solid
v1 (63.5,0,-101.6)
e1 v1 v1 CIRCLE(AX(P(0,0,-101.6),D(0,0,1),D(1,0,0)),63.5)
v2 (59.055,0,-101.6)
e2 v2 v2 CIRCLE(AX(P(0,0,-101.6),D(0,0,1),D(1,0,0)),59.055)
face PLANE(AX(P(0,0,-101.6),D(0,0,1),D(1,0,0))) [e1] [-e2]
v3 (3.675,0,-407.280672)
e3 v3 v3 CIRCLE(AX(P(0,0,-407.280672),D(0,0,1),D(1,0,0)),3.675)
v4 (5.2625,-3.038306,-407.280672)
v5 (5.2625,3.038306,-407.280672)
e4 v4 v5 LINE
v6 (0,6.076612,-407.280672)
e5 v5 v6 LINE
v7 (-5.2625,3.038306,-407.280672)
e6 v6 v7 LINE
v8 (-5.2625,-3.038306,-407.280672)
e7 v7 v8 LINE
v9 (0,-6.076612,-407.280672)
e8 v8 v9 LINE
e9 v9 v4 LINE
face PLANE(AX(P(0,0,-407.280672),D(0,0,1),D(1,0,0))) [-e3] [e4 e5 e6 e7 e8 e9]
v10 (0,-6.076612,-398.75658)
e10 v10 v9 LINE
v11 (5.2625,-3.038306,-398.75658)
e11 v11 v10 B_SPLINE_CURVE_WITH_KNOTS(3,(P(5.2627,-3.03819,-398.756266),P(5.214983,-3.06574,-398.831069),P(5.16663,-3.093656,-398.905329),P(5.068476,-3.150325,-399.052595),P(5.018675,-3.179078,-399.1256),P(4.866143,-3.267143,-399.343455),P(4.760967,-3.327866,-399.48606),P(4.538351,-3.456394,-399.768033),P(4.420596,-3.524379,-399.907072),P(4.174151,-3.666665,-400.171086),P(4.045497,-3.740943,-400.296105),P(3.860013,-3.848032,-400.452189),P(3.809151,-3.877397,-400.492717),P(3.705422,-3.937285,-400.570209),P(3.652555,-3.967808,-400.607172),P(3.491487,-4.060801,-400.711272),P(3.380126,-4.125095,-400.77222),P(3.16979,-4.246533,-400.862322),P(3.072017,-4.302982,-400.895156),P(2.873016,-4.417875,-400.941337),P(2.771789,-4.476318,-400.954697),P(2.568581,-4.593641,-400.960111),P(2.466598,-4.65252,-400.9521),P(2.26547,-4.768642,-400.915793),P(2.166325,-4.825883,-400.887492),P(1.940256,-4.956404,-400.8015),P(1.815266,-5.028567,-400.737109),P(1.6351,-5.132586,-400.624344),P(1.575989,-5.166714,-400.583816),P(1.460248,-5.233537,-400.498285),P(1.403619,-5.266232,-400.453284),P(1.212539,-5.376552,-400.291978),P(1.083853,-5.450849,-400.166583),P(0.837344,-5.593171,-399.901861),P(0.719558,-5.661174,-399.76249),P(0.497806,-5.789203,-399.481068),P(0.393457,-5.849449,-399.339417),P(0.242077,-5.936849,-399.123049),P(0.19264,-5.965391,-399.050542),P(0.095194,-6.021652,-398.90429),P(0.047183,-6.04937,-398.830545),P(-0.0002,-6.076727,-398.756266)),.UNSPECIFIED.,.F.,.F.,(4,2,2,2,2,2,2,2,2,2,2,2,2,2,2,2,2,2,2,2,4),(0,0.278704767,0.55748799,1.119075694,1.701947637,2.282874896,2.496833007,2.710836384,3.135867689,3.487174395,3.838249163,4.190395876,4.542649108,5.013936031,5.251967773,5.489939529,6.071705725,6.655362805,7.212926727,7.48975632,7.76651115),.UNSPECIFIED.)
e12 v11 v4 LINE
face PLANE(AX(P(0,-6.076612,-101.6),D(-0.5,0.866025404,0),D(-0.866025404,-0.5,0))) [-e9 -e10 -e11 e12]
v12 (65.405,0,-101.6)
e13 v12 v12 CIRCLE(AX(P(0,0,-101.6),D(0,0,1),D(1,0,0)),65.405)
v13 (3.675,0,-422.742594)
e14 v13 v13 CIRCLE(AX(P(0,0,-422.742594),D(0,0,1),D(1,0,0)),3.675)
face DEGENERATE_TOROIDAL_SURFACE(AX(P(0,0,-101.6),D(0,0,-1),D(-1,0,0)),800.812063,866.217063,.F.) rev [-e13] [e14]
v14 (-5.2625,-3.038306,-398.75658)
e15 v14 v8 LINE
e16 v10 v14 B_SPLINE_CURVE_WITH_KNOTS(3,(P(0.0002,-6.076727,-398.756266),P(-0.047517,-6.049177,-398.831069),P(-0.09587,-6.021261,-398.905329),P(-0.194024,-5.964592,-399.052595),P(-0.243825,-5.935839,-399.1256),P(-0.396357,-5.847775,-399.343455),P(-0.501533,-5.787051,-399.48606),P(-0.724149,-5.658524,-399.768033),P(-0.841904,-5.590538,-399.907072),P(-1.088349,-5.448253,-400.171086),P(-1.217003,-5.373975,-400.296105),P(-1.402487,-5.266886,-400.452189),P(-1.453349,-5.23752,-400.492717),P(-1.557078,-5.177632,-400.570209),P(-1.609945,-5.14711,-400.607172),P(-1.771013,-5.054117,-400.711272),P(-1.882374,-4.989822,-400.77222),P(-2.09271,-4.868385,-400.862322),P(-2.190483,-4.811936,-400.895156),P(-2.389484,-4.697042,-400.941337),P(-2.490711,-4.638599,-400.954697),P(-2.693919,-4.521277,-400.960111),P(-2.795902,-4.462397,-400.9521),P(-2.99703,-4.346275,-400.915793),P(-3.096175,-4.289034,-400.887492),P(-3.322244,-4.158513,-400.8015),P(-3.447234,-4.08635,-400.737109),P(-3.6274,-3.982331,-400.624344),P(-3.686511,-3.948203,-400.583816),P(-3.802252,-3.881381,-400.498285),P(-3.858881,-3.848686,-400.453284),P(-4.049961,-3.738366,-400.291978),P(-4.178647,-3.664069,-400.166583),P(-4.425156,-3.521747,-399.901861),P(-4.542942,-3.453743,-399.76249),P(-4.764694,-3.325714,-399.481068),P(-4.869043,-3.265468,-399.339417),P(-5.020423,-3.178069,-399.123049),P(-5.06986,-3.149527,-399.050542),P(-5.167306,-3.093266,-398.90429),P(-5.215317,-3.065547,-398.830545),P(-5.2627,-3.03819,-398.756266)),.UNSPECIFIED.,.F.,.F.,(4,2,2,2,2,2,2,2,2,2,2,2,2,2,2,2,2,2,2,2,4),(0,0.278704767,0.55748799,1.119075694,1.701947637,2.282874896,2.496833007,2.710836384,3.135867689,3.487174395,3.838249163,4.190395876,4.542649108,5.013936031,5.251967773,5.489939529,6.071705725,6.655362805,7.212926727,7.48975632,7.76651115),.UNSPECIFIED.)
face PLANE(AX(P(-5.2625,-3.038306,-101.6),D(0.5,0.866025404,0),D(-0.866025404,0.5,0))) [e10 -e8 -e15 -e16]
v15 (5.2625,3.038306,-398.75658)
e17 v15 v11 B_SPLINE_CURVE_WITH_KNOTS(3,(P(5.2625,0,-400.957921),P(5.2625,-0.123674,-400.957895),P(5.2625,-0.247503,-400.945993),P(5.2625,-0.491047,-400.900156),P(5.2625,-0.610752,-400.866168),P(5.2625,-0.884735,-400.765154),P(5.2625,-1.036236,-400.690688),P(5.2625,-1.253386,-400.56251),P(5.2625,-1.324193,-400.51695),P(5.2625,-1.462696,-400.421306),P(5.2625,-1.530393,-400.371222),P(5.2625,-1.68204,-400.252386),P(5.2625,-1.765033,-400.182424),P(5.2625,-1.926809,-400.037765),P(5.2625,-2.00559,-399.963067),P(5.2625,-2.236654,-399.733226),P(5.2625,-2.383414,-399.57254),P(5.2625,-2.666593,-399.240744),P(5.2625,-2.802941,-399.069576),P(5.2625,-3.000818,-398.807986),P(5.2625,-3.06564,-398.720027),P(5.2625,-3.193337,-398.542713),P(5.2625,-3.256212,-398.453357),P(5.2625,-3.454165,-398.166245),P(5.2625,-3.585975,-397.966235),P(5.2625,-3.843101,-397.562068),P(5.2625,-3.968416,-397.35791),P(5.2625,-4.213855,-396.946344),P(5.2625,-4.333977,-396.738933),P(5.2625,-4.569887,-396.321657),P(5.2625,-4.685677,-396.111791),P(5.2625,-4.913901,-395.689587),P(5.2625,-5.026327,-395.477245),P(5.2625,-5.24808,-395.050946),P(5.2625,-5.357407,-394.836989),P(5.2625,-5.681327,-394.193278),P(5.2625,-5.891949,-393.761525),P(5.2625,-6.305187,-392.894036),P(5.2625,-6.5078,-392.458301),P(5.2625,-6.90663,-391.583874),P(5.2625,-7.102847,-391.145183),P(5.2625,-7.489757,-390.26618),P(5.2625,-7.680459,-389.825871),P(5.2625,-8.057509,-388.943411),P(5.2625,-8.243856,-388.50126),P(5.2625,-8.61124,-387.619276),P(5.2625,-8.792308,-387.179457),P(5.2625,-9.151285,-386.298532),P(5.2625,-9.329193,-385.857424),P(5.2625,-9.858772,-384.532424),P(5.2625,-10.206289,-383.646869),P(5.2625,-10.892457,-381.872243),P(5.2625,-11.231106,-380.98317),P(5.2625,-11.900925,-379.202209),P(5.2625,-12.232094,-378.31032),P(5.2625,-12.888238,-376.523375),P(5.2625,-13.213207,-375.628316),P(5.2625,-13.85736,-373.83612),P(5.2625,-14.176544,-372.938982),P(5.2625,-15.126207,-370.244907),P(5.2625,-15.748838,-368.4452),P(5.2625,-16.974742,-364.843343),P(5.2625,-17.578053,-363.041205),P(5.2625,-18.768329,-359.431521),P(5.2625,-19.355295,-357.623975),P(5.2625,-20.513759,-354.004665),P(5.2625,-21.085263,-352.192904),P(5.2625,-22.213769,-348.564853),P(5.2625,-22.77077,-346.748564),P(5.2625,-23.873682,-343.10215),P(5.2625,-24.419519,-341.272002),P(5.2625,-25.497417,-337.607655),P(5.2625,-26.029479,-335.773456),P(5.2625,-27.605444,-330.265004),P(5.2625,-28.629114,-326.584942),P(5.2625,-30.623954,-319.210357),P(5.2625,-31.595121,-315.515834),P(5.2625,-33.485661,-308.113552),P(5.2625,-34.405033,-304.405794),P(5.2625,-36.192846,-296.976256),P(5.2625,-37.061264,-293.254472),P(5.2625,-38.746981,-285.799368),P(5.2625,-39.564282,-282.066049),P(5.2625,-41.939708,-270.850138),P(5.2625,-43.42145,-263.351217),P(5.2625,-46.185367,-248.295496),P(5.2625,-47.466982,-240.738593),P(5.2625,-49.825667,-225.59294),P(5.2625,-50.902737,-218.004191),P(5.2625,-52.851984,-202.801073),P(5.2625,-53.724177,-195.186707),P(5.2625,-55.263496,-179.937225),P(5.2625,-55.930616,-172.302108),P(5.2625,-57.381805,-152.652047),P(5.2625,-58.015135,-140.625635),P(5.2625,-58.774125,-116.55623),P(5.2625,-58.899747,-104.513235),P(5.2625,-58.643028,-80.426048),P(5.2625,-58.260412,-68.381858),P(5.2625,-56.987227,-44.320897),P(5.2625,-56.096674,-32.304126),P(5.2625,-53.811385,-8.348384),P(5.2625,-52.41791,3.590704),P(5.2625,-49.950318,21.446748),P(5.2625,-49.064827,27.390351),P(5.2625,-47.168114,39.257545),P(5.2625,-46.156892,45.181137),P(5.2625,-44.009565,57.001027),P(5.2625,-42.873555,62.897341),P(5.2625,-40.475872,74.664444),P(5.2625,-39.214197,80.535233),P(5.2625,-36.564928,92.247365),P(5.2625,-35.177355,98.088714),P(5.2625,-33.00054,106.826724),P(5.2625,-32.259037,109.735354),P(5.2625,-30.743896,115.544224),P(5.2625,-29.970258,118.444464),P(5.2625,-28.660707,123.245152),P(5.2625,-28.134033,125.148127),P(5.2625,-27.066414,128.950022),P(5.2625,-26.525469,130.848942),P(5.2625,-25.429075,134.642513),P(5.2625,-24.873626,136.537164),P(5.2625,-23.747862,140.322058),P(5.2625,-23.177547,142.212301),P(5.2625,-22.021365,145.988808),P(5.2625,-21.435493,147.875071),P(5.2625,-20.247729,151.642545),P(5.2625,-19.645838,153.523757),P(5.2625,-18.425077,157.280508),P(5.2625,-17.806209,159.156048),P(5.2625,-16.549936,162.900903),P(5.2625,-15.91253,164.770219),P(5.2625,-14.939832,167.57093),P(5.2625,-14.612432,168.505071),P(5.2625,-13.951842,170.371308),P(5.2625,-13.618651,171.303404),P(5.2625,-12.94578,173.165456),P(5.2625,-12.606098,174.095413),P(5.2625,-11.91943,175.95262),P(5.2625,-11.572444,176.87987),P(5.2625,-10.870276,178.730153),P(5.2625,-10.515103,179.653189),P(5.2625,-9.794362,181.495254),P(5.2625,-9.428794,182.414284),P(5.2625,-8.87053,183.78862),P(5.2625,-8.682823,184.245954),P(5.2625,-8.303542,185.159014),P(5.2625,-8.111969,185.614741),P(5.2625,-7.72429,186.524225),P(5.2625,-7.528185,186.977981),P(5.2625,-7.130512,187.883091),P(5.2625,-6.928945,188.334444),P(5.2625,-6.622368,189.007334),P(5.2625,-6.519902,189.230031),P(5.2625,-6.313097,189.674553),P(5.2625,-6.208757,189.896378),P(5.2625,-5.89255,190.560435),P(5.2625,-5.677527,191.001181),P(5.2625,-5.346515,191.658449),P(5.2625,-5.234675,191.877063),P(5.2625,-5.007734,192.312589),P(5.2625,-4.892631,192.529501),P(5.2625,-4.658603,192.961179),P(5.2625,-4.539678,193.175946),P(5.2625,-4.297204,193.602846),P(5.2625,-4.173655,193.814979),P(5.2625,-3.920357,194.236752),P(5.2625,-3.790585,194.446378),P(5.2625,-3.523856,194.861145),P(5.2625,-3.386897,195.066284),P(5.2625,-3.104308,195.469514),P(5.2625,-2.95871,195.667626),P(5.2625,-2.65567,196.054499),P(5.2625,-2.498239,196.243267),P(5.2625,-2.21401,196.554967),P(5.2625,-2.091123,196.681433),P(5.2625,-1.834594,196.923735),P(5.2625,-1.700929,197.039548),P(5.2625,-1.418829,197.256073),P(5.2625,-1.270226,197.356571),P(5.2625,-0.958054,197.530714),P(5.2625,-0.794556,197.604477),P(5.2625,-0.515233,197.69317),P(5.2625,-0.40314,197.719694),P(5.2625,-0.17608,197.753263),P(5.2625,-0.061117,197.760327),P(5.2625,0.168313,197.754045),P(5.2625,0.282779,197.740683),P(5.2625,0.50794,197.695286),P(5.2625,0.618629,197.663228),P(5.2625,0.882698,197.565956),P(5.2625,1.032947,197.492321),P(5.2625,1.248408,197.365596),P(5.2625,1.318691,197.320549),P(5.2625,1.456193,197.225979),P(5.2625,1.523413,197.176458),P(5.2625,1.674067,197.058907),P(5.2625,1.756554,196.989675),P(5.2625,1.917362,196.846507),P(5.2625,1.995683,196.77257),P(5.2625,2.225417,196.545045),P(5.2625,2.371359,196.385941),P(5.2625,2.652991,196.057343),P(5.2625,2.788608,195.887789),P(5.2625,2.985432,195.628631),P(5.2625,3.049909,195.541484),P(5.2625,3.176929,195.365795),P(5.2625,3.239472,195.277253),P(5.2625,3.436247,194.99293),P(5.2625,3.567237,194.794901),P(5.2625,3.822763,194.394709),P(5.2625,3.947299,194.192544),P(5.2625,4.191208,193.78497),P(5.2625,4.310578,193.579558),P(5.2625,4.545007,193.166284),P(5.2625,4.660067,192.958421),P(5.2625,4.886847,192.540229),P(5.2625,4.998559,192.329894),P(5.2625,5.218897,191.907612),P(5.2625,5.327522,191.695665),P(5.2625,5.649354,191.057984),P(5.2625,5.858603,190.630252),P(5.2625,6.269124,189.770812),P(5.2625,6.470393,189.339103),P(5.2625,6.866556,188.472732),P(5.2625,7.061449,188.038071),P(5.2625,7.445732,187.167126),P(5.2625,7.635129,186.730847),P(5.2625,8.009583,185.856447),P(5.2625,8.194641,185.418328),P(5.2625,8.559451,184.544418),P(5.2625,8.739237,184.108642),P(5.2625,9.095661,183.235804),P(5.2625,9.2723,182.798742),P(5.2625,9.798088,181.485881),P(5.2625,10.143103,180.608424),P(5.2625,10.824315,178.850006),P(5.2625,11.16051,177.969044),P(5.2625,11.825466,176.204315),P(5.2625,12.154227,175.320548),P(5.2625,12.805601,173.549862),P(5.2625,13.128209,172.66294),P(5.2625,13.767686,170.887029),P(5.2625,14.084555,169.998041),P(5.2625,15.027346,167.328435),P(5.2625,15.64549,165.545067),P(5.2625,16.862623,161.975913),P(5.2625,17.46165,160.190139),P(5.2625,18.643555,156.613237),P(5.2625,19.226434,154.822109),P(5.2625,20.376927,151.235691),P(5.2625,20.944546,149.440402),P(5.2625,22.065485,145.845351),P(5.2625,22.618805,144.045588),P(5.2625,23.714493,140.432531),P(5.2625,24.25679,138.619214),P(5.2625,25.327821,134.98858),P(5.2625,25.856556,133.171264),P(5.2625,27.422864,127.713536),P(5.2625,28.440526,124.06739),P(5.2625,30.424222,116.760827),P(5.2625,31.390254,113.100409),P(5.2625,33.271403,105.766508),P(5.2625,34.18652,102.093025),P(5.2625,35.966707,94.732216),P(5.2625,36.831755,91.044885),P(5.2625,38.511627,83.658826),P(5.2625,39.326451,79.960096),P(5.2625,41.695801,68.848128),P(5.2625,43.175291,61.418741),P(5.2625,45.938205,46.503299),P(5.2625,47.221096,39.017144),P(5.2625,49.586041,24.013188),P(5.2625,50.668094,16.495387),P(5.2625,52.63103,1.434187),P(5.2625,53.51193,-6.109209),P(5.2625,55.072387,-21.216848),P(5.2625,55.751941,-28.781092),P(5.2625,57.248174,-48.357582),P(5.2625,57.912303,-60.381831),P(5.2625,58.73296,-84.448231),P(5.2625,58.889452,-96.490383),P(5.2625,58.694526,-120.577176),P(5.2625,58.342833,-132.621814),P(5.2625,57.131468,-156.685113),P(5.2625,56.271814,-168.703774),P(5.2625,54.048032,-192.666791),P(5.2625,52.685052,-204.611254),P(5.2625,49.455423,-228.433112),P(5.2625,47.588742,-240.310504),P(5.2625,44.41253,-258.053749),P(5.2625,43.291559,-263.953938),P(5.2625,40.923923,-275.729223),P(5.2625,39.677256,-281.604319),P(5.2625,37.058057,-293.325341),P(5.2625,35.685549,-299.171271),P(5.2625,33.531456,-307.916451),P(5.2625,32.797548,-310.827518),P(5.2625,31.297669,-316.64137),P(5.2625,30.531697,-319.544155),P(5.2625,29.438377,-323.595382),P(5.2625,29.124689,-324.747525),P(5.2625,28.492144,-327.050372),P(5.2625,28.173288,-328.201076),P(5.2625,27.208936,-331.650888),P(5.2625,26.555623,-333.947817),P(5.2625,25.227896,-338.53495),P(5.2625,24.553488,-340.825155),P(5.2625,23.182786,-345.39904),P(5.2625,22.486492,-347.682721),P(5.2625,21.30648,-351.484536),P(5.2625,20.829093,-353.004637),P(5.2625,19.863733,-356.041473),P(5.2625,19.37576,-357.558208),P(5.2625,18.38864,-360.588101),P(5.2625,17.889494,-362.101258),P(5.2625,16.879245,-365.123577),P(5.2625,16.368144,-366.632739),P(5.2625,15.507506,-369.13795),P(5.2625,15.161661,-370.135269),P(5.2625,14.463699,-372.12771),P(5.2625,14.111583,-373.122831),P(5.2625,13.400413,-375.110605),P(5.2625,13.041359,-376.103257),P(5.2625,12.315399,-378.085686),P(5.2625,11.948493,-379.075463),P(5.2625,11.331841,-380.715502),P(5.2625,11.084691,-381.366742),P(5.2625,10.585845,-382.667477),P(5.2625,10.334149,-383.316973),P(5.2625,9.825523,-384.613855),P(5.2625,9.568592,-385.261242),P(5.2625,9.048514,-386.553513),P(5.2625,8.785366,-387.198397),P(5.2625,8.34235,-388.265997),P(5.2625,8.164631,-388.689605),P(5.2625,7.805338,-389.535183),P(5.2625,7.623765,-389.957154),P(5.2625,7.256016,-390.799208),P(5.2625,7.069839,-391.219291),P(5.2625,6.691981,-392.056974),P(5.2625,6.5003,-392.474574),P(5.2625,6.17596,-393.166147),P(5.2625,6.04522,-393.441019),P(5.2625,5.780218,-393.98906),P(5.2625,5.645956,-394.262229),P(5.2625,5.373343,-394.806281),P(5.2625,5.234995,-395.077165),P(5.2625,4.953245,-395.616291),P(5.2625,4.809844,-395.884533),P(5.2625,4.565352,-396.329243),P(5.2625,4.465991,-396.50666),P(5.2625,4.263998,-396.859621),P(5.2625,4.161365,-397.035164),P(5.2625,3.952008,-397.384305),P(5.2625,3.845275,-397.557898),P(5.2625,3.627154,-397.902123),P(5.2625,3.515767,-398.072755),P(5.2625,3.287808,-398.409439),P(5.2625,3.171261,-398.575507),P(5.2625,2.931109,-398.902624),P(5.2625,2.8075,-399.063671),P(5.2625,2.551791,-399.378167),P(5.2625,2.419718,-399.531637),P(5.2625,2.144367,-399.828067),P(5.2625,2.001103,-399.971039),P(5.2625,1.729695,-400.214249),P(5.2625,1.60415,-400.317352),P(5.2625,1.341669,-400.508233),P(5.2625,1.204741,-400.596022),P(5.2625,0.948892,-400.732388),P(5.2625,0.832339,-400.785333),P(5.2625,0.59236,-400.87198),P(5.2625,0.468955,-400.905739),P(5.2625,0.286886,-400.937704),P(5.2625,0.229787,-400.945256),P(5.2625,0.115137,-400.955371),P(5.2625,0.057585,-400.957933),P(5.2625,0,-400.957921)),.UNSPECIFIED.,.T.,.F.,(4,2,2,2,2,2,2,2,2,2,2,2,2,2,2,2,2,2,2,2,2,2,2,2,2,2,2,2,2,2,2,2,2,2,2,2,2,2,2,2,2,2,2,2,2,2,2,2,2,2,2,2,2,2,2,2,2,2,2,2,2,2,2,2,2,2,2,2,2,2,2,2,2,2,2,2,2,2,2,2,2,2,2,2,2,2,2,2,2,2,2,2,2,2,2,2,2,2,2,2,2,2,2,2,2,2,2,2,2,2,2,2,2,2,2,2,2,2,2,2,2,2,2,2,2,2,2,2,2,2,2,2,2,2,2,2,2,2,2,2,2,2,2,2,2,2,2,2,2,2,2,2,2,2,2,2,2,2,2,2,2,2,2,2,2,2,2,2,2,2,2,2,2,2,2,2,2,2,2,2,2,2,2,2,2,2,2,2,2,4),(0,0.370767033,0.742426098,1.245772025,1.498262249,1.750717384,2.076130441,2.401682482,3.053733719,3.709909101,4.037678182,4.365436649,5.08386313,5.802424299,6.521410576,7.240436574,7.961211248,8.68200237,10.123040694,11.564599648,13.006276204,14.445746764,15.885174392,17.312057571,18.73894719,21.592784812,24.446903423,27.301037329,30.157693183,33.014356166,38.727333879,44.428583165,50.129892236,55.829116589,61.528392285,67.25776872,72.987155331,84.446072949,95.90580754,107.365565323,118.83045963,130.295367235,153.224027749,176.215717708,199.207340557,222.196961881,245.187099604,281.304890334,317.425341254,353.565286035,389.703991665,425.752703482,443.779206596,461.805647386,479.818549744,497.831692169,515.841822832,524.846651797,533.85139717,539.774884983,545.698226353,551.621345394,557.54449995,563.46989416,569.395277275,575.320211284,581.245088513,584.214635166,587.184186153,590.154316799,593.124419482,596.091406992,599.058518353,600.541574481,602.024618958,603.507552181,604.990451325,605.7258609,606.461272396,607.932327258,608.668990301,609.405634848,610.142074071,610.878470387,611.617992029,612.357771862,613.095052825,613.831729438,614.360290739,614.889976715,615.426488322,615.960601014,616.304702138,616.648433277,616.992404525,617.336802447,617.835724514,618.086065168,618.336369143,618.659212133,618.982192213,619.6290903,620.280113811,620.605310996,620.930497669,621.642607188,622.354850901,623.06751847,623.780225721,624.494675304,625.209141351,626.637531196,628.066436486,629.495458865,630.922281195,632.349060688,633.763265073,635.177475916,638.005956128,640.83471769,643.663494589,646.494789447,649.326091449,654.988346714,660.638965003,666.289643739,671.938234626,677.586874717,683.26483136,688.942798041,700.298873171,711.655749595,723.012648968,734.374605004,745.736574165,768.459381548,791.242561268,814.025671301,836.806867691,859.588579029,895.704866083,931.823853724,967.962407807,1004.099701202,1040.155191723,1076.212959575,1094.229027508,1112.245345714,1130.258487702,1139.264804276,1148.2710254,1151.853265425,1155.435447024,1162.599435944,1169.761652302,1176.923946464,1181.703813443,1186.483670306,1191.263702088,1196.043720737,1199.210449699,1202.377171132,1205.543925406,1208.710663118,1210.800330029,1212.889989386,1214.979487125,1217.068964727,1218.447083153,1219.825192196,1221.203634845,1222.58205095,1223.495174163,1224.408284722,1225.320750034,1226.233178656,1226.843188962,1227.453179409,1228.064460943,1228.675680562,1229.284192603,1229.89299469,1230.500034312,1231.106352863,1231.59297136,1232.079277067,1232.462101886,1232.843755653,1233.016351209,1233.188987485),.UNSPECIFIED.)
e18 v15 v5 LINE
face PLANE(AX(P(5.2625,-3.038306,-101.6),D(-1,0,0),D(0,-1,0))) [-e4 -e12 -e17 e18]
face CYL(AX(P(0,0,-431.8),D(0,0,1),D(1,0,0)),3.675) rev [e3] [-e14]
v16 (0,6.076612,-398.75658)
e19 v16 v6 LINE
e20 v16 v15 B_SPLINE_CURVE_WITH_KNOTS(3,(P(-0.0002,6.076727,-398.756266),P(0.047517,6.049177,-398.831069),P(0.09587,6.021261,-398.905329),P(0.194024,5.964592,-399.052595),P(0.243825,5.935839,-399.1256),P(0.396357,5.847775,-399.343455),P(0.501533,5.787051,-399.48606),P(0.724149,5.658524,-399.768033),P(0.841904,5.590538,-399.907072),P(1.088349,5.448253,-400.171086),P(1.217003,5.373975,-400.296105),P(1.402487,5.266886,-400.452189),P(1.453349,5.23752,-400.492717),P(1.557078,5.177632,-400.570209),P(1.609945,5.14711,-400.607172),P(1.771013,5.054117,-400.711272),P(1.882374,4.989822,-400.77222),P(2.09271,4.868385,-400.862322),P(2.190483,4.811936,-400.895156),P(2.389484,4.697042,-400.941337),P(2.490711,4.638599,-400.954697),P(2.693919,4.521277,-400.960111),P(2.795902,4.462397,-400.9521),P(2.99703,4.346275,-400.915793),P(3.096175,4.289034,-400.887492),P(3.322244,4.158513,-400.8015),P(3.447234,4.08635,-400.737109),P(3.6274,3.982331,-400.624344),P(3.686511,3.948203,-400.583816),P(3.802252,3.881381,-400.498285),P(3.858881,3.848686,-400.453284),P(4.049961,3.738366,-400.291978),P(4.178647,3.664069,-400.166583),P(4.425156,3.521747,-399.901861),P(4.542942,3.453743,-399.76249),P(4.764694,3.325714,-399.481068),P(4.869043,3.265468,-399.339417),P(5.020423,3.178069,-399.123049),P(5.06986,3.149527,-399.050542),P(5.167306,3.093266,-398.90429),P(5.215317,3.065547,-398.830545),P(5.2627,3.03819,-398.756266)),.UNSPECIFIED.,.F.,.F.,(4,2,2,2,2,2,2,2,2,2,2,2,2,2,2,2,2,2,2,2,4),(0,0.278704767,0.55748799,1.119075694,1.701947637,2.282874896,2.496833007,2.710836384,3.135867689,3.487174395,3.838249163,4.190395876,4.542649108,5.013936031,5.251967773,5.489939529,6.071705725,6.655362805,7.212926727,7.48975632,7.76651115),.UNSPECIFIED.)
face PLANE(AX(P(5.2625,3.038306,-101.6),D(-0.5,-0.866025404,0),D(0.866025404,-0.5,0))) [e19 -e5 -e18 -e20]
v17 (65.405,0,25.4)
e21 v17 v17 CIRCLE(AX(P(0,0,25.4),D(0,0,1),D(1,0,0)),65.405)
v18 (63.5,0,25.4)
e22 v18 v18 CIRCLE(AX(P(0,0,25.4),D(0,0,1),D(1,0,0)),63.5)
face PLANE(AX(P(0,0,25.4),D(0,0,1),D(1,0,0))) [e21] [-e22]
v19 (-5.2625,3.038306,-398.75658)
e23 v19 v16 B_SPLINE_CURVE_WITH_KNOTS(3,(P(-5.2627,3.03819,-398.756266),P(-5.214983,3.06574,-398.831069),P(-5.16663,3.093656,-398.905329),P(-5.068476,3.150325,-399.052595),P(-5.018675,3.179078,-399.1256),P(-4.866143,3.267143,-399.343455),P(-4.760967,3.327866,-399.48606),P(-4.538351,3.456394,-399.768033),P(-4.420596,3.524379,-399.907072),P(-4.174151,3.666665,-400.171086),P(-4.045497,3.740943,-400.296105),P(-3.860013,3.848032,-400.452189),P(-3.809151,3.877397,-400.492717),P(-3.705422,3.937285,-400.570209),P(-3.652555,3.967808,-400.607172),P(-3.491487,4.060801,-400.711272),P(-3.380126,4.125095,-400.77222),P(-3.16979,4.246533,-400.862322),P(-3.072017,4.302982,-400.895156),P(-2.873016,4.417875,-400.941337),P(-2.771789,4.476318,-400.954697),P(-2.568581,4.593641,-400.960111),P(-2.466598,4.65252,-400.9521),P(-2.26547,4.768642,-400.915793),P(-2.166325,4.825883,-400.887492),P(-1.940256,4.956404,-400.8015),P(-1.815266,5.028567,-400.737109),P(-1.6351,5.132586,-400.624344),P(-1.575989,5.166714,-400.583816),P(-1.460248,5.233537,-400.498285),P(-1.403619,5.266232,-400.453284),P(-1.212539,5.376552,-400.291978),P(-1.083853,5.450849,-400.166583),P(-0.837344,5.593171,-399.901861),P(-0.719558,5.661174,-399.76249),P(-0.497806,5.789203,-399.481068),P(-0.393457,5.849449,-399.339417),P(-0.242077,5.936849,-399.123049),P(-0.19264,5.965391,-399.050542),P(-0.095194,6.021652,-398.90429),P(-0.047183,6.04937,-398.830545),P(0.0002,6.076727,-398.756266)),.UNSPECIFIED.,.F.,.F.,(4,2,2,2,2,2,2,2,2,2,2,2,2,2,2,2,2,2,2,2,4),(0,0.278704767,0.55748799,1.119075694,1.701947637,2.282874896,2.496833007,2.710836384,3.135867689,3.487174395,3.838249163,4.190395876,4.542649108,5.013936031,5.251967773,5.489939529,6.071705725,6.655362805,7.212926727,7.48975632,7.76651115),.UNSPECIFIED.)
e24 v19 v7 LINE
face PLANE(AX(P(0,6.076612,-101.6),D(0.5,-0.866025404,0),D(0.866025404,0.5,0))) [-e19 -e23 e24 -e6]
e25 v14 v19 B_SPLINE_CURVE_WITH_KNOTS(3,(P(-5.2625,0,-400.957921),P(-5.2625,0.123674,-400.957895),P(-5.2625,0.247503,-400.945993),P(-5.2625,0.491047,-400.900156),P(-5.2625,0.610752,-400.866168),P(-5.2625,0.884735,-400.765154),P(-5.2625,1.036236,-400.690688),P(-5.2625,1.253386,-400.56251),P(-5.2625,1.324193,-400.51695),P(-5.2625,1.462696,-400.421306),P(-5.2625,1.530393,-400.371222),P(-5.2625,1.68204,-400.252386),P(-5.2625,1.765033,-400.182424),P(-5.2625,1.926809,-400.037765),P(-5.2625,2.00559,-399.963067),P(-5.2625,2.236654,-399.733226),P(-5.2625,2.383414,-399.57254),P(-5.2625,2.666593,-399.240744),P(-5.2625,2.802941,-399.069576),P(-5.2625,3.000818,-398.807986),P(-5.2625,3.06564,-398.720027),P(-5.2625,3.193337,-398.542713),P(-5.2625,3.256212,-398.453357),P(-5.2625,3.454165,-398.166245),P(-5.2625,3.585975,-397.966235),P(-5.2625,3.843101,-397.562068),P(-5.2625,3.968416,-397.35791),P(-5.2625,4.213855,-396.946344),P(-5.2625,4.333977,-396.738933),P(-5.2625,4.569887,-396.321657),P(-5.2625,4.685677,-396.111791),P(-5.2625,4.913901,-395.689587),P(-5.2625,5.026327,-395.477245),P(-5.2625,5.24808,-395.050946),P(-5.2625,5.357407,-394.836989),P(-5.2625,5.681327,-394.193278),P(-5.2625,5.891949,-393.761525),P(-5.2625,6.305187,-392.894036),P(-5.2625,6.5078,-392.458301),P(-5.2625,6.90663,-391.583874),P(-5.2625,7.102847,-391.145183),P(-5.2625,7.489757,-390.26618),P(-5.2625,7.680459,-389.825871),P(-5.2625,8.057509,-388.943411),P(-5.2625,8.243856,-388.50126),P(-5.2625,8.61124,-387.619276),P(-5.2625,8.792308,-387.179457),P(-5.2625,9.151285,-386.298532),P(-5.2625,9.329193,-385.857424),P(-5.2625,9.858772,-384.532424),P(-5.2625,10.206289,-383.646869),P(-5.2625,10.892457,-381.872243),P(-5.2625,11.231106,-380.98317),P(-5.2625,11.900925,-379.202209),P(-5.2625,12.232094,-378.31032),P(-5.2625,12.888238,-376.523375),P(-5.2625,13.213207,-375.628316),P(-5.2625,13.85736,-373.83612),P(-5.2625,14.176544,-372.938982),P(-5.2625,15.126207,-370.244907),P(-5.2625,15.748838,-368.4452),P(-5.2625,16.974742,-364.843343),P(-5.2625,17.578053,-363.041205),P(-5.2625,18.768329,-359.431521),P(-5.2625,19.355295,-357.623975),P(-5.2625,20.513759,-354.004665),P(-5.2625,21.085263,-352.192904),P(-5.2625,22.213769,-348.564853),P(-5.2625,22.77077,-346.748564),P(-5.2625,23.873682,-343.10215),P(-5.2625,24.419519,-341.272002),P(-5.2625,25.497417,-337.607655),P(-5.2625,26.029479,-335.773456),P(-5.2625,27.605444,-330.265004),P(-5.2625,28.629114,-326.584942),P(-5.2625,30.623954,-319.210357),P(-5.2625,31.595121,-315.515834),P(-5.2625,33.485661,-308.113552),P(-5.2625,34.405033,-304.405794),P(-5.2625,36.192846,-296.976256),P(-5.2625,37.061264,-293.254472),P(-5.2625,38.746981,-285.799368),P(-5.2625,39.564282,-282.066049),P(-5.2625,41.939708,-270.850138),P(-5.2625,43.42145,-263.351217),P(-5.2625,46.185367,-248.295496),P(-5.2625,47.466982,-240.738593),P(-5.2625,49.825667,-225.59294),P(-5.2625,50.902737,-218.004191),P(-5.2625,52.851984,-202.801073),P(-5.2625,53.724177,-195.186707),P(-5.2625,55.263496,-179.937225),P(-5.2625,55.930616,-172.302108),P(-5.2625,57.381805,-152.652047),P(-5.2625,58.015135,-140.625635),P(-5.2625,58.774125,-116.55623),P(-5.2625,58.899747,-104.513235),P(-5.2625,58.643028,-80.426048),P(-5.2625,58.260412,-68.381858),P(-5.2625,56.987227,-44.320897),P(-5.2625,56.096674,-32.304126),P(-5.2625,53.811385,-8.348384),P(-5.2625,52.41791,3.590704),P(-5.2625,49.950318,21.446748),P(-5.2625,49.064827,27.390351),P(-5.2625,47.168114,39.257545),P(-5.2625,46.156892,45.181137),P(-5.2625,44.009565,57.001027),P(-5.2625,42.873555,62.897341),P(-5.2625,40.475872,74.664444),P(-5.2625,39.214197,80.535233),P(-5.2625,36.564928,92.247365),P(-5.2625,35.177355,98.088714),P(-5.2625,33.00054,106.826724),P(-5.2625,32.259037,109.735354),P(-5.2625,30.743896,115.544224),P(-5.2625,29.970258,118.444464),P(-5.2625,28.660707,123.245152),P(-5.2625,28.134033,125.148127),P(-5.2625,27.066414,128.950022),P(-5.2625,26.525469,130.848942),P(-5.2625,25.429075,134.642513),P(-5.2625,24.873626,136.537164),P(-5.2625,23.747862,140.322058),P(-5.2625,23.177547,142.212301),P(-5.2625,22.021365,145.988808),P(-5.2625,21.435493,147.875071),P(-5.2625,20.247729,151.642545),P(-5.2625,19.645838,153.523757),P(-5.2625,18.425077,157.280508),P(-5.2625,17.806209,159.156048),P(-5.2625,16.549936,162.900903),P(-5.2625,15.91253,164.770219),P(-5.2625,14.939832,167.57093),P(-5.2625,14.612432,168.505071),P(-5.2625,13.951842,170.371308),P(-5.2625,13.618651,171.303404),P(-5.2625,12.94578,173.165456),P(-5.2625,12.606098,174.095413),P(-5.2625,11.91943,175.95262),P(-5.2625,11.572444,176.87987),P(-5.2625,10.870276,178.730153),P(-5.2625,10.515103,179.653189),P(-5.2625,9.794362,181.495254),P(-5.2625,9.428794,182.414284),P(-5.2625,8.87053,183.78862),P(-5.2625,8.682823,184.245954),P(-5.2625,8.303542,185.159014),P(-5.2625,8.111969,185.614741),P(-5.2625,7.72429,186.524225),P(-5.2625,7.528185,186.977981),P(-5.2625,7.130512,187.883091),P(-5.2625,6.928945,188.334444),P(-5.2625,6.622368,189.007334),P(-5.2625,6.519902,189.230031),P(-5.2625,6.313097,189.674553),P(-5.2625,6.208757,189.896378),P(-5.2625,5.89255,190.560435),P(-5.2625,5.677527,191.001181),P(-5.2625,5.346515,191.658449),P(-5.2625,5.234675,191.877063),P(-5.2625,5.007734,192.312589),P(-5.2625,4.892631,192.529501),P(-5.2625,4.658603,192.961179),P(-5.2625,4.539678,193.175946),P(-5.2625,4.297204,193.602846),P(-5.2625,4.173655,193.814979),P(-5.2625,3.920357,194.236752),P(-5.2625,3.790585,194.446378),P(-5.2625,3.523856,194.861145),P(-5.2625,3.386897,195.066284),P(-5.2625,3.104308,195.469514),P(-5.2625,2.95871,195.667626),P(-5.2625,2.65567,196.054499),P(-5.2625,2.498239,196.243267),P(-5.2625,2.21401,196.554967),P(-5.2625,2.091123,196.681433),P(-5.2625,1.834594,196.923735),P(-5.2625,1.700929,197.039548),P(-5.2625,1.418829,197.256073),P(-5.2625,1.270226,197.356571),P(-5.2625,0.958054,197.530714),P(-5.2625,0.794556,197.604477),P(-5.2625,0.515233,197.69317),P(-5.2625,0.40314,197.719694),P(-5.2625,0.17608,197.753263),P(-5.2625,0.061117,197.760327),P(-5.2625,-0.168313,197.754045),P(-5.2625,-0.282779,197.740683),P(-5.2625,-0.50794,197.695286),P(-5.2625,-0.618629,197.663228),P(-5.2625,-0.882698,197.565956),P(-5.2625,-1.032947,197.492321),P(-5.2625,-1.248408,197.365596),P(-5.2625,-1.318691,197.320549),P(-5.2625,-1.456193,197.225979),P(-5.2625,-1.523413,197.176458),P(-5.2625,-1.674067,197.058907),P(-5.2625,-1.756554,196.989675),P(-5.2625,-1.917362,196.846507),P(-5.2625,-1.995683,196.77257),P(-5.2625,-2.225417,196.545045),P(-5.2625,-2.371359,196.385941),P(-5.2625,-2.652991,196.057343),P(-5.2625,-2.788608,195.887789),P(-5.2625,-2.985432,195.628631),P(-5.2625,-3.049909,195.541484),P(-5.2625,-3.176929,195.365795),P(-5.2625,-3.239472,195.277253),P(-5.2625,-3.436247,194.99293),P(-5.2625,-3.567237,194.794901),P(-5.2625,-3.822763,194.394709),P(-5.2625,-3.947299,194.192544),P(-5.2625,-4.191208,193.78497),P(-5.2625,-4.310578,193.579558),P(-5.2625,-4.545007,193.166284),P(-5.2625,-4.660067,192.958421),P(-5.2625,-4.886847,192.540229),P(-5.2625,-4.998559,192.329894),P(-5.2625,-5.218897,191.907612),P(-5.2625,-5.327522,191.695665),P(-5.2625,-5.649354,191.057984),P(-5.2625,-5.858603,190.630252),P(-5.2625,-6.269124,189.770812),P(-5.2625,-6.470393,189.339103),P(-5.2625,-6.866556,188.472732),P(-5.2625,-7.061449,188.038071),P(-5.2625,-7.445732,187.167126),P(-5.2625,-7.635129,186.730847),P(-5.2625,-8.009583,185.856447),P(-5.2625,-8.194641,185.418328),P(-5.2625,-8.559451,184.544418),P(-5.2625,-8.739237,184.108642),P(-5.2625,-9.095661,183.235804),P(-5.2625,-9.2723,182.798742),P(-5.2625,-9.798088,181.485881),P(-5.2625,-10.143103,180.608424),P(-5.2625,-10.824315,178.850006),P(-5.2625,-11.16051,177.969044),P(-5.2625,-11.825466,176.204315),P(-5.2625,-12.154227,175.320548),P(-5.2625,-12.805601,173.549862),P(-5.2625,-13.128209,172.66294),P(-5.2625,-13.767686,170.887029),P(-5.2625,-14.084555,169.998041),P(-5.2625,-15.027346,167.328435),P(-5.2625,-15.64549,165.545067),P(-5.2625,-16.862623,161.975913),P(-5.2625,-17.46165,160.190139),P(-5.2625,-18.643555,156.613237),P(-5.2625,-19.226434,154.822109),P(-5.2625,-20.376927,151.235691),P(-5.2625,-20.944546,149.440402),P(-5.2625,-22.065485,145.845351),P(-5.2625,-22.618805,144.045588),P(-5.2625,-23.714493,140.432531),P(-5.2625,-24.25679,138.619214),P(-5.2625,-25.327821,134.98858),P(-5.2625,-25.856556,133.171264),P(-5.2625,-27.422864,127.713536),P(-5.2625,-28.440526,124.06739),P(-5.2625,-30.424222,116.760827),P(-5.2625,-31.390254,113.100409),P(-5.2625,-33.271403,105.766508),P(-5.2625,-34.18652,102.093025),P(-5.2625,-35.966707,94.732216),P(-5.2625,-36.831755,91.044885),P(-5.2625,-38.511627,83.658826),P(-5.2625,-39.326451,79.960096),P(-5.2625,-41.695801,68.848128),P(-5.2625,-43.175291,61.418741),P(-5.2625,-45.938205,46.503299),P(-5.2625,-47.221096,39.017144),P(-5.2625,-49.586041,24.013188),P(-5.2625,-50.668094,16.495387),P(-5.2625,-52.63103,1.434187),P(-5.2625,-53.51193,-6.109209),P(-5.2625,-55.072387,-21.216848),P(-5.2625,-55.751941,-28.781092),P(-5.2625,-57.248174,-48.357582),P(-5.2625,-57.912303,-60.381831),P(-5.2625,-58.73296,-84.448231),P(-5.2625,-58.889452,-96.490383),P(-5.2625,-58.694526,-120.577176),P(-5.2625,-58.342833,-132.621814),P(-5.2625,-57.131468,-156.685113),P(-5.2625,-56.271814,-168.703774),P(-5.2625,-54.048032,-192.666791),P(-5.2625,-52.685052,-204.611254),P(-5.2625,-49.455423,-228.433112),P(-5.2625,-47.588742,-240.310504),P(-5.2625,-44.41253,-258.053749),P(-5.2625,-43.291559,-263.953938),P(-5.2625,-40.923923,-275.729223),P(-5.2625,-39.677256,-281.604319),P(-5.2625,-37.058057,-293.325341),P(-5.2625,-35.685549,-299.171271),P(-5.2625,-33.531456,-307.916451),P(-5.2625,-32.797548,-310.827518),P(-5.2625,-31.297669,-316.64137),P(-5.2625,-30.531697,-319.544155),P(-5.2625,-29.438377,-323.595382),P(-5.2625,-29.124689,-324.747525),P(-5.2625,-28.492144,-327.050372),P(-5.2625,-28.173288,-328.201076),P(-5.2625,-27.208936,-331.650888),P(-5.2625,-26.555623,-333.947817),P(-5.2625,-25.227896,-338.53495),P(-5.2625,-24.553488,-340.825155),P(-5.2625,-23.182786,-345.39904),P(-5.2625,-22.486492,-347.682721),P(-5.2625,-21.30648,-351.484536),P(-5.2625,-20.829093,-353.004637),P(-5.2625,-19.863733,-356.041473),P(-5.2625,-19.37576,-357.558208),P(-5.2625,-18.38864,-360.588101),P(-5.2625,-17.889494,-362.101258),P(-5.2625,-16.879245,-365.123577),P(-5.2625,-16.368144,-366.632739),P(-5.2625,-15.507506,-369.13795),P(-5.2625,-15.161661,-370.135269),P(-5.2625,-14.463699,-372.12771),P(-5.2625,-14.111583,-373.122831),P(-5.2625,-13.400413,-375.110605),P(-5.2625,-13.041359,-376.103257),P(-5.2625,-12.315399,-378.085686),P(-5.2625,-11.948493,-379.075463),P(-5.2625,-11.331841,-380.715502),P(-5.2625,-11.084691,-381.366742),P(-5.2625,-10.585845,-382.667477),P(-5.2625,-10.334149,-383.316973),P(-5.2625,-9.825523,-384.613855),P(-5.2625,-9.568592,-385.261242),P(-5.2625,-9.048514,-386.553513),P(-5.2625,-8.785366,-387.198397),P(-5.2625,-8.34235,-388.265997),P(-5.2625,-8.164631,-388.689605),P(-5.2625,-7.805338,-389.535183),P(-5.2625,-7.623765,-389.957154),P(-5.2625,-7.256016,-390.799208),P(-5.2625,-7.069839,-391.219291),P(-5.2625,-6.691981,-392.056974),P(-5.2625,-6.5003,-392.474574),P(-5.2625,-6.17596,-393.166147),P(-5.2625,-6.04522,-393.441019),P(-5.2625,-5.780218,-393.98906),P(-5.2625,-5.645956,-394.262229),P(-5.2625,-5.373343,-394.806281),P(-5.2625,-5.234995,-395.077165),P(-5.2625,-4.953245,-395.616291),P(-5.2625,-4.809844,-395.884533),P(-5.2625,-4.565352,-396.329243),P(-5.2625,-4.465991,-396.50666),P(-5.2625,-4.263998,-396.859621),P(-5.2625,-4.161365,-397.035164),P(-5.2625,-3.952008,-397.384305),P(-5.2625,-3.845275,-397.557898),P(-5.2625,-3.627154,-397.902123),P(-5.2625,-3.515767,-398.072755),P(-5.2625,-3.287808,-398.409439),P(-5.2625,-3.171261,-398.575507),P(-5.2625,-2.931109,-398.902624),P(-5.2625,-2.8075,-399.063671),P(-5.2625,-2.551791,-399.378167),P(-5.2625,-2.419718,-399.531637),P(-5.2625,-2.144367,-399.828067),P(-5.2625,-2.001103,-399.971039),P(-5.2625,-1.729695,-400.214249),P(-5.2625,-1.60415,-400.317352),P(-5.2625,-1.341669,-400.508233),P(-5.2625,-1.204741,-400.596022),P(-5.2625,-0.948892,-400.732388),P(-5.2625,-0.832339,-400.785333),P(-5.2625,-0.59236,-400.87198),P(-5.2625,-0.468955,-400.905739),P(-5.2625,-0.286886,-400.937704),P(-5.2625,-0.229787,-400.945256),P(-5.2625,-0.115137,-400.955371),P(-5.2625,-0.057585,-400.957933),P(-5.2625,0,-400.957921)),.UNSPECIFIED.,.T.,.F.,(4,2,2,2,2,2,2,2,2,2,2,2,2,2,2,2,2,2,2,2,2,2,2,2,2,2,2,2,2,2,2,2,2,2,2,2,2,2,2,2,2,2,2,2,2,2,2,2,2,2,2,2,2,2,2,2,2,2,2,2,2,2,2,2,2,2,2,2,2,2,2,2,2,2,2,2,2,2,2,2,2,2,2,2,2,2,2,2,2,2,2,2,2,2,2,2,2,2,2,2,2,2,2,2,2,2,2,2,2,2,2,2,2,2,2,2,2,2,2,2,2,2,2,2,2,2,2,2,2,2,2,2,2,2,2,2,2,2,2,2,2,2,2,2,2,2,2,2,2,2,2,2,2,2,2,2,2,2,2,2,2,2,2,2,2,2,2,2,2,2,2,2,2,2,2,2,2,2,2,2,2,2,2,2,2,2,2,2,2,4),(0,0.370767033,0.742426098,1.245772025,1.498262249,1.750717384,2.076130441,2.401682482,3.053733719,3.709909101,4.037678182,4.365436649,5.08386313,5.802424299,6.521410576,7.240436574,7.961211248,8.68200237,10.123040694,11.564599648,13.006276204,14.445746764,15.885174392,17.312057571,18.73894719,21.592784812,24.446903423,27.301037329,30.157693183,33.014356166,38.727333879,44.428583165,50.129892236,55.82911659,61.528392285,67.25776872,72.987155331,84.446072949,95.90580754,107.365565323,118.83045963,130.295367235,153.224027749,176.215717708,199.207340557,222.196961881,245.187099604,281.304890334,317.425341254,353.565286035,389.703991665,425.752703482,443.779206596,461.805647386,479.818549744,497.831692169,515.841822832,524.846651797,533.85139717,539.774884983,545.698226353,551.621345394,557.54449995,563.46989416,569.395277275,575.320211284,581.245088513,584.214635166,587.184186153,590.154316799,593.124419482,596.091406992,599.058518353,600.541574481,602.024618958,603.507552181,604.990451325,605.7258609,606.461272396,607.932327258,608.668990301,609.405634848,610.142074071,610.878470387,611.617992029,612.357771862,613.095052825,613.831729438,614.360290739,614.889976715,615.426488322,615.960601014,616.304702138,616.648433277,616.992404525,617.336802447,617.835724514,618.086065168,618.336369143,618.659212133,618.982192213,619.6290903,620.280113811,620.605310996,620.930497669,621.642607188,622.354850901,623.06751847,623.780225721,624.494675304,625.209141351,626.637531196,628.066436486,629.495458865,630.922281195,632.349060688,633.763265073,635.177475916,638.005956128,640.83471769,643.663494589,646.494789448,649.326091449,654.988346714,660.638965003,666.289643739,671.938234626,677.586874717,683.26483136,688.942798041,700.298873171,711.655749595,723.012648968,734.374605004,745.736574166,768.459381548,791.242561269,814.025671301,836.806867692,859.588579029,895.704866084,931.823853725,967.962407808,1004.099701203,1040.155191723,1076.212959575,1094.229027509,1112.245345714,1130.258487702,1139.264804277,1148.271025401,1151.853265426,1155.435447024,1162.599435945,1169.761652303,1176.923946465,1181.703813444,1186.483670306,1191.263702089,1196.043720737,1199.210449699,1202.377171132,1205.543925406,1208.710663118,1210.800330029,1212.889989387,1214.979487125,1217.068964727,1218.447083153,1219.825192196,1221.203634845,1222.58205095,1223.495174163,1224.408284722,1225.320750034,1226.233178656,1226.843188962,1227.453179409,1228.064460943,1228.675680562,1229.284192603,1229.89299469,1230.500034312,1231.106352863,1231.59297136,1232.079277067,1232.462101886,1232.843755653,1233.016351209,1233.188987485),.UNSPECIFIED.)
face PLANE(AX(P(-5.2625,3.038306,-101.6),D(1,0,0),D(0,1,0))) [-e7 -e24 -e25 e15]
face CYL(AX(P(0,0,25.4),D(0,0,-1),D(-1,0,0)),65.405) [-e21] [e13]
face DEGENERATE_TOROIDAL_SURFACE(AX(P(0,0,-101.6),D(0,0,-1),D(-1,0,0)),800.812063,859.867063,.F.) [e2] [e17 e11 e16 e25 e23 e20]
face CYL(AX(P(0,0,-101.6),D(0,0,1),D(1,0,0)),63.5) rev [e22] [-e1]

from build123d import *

# Parameters (mm, degrees)
CUT_EXTRUDE1_DEPTH  = 320.36859803
SKETCH3_R           = 3.675
CUT_EXTRUDE2_DEPTH  = 320.36859803
SKETCH8_R           = 65.405
SKETCH8_R_2         = 52.705
BOSS_EXTRUDE1_DEPTH = 127
SKETCH9_R           = 63.5
SKETCH9_R_2         = 2.5
CUT_EXTRUDE4_DEPTH  = 127


# Read off the part's stored shape, not the designer's step: Shell1
with BuildPart() as part:
    # Sketch1 → Revolve1 (revolve)
    with BuildSketch(Plane(origin=(0, 0, 0), x_dir=(1, 0, 0), z_dir=(0, 1, 0))):
        with BuildLine():
            Line((0, 431.8), (0, 101.6))
            Line((0, 101.6), (65.405, 101.6))
            ThreePointArc((65.405, 101.6), (48.896438034, 269.907645418), (0, 431.8))
        make_face()
    revolve(axis=Axis((0, 0, -431.8), (0, 0, 1)))

    # Shell1 outline → Shell1 (revolve, cut)
    with BuildSketch(Plane.XZ):
        with BuildLine():
            add(Edge.make_bspline(
                [(59.055, -101.6), (59.055, -263.749938118), (0, -414.763544811)],
                knots=[0, 0, 0, 0.372773614, 0.372773614, 0.372773614], degree=2, weights=[1, 0.982680207, 1]))
            Line((59.055, -101.6), (0, -101.5999999))
            Line((0, -101.5999999), (0, -414.763544811))
        make_face()
    revolve(axis=Axis((0, 0, 0), (0, 0, 1)), mode=Mode.SUBTRACT)

    # Sketch2 → Cut-Extrude1 (cut, through all)
    with BuildSketch(Plane.XY.offset(-407.280672059)):
        Polygon((0, 6.076611583), (-5.2625, 3.038305792), (-5.2625, -3.038305792), (0, -6.076611583), (5.2625, -3.038305792), (5.2625, 3.038305792), align=None)
    extrude(amount=CUT_EXTRUDE1_DEPTH, mode=Mode.SUBTRACT)

    # Sketch3 → Cut-Extrude2 (cut, through all)
    with BuildSketch(Plane.XY.offset(-407.280672059)):
        Circle(SKETCH3_R)
    extrude(amount=-CUT_EXTRUDE2_DEPTH, mode=Mode.SUBTRACT)

    # Sketch8 → Boss-Extrude1 (add)
    with BuildSketch(Plane.XY.offset(-101.6)):
        Circle(SKETCH8_R)
        Circle(SKETCH8_R_2, mode=Mode.SUBTRACT)
    extrude(amount=BOSS_EXTRUDE1_DEPTH)

    # Sketch9 → Cut-Extrude4 (cut)
    with BuildSketch(Plane.XY.offset(25.4)):
        Circle(SKETCH9_R)
        Circle(SKETCH9_R_2, mode=Mode.SUBTRACT)
    extrude(amount=-CUT_EXTRUDE4_DEPTH, mode=Mode.SUBTRACT)


solid = part.part
